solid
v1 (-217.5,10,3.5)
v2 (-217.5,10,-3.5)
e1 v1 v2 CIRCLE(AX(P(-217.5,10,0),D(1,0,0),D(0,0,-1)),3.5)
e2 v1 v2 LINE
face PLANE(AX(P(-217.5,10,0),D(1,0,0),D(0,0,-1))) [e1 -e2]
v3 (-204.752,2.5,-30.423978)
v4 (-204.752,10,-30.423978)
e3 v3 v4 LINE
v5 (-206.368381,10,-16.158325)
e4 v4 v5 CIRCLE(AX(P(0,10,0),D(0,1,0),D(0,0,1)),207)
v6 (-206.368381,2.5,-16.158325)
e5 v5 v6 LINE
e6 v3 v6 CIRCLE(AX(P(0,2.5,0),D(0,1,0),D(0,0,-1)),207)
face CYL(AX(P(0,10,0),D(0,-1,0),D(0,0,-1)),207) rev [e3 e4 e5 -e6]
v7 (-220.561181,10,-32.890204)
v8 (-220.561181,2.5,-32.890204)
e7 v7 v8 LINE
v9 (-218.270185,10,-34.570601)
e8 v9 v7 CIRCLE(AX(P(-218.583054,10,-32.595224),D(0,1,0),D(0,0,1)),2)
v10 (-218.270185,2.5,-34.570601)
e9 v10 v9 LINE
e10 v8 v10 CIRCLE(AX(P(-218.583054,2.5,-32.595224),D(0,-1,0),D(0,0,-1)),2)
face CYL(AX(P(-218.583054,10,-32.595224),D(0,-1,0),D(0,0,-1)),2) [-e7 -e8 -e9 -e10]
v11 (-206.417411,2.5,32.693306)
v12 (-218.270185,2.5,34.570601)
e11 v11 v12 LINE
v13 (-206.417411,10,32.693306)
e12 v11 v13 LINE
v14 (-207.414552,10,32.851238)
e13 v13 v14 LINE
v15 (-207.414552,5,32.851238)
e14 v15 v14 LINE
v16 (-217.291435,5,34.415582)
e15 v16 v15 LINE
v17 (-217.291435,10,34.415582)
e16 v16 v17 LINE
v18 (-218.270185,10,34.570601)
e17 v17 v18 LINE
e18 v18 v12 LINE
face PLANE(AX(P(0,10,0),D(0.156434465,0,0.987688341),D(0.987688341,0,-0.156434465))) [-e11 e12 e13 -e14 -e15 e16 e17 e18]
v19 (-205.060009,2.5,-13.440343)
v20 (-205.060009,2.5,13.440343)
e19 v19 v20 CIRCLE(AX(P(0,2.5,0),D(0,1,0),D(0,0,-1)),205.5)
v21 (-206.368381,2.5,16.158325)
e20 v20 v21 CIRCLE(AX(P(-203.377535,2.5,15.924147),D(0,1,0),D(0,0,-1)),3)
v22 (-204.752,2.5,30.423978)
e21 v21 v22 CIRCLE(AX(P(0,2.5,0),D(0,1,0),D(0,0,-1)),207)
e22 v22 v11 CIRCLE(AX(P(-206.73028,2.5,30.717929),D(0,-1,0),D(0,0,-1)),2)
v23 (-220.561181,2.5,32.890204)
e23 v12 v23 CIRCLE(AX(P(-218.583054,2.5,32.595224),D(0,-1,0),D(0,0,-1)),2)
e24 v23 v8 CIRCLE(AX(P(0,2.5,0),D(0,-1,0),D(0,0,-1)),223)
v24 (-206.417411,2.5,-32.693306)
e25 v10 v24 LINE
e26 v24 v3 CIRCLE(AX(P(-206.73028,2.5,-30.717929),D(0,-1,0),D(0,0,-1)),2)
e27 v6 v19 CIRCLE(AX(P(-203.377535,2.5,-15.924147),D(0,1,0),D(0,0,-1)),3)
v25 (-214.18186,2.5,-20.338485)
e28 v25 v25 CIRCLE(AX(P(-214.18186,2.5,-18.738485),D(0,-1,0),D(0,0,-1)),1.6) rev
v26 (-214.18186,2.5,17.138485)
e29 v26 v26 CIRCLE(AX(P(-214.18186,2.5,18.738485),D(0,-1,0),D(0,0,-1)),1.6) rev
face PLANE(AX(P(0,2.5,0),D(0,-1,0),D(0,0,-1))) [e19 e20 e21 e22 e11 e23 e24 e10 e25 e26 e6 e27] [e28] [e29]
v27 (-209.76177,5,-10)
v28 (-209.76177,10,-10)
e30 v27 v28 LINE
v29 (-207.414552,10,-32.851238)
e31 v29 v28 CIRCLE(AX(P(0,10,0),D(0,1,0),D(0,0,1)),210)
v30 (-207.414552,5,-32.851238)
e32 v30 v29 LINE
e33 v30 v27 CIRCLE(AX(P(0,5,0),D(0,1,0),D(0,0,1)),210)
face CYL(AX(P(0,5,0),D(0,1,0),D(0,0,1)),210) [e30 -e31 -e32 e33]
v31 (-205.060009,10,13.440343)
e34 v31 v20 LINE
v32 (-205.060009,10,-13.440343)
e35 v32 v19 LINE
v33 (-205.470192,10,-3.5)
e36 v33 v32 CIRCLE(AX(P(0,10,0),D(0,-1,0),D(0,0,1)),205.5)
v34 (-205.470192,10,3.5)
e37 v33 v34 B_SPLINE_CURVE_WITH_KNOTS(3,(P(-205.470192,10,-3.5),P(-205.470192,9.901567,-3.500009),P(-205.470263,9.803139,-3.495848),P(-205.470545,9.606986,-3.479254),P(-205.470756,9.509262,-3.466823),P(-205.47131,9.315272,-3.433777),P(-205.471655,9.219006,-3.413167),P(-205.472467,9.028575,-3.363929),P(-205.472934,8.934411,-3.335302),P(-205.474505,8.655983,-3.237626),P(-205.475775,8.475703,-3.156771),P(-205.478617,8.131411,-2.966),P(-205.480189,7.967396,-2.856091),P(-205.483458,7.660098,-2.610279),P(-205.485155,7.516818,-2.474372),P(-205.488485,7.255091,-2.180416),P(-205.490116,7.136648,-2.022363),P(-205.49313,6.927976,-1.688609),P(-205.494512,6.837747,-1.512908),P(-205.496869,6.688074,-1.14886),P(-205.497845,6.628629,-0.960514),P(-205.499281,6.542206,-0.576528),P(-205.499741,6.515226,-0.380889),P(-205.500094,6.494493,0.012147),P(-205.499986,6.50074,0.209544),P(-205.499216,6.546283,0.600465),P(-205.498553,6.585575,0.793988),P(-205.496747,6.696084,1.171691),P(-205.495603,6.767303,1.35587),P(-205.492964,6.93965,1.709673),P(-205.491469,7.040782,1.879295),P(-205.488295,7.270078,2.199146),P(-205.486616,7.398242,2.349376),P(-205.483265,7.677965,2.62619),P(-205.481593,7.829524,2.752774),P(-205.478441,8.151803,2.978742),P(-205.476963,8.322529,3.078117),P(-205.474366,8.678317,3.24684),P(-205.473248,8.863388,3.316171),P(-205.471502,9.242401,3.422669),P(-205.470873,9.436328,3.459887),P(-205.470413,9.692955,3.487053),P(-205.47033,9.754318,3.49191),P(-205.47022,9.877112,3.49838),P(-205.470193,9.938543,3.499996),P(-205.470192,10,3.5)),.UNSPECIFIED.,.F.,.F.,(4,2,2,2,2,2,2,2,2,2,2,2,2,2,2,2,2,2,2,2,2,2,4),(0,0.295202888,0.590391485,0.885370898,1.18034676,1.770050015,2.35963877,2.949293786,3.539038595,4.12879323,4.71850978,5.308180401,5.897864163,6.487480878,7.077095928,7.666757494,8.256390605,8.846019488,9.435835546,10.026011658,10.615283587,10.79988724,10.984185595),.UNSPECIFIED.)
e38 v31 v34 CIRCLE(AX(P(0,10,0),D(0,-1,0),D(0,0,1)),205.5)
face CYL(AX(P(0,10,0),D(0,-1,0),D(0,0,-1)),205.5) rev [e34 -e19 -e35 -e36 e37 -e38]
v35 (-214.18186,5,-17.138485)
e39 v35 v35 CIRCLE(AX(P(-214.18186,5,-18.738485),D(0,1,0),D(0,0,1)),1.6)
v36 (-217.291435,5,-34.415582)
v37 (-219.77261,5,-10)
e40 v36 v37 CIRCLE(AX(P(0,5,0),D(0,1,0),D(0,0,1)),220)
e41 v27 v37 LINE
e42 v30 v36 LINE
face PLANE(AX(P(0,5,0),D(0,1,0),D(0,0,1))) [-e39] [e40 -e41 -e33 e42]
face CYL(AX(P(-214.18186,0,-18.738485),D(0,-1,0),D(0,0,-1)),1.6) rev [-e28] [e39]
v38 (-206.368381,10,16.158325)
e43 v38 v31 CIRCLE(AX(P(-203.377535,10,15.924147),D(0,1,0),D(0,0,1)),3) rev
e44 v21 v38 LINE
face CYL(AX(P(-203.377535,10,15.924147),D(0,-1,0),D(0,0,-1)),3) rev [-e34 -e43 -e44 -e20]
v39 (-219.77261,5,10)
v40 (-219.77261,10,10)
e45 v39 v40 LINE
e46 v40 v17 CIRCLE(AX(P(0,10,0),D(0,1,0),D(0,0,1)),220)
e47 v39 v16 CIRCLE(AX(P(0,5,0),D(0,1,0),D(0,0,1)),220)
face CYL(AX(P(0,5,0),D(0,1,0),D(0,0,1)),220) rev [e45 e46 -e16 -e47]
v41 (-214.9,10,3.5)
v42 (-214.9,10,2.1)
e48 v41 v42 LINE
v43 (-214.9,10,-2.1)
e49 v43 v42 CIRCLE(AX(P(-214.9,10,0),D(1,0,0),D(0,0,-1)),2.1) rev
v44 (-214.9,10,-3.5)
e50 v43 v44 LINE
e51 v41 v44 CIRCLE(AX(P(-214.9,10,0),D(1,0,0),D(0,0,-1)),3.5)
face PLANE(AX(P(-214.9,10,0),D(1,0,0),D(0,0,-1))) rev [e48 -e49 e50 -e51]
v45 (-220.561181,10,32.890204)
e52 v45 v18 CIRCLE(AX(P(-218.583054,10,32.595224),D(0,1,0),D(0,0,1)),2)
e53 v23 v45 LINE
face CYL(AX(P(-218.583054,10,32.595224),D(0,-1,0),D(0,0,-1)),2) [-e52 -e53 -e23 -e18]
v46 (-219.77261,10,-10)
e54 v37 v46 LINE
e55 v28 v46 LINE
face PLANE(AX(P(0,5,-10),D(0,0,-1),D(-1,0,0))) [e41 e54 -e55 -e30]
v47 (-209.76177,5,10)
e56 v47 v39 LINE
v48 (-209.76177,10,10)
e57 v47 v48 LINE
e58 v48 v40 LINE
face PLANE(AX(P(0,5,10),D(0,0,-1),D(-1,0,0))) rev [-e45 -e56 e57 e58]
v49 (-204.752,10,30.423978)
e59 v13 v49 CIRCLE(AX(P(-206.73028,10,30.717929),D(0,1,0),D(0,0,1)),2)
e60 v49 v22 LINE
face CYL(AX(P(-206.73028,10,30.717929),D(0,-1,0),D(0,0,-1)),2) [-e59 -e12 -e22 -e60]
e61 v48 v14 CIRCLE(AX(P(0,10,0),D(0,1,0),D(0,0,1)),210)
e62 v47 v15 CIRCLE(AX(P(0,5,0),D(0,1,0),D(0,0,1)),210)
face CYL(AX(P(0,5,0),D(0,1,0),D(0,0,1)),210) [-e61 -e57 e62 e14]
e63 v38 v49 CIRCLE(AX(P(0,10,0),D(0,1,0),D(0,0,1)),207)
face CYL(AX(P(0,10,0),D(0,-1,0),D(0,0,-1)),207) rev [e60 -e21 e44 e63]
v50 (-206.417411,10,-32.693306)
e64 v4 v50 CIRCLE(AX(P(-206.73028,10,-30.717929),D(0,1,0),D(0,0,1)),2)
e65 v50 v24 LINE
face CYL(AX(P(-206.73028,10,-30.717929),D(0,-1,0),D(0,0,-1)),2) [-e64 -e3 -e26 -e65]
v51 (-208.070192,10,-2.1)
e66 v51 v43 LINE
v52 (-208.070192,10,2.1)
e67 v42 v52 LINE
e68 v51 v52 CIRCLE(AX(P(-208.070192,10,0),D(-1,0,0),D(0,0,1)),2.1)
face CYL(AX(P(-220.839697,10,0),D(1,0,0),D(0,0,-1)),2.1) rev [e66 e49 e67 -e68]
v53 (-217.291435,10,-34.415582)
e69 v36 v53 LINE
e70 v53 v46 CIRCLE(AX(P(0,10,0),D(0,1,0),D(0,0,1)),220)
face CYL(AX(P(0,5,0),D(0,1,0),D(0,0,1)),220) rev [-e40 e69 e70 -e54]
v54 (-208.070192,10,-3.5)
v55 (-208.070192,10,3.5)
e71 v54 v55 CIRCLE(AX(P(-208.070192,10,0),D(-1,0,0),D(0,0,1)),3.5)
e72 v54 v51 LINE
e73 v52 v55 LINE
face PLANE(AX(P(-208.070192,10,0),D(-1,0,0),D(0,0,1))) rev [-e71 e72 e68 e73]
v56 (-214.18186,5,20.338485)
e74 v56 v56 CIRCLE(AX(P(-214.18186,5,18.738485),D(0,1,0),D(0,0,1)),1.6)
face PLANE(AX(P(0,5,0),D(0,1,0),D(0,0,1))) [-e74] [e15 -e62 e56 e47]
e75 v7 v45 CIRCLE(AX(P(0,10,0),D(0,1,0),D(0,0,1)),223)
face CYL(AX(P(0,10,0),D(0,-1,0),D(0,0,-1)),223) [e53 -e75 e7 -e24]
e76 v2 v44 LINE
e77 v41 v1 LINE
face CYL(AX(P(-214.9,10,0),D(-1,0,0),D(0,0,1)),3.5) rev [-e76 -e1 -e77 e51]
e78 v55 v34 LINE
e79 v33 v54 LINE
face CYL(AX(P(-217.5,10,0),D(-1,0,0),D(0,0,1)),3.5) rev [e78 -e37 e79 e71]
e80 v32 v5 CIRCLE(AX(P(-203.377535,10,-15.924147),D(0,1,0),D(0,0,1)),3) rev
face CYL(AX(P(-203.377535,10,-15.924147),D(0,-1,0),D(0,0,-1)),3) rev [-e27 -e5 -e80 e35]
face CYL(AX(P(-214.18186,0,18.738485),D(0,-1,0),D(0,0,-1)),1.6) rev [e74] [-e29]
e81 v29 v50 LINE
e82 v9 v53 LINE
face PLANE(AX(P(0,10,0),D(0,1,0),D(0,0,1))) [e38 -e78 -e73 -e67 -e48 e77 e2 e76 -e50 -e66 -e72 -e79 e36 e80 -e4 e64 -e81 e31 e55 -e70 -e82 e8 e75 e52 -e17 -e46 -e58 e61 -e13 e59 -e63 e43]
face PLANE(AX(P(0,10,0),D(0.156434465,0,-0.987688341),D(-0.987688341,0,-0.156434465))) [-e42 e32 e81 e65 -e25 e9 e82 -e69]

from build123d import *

# Parameters (mm, degrees)
BOSS_EXTRUDE1_DEPTH        = 10
CUT_EXTRUDE1_DEPTH         = 5
F_3_2_3_2_DIAMETER_HOLE1_D = 3.2
BOSS_EXTRUDE2_DEPTH        = 10
FILLET1_R                  = 3
FILLET2_R                  = 2
CUT_EXTRUDE6_DEPTH         = 2.5
SKETCH28_R                 = 3.5
CUT_EXTRUDE7_DEPTH         = 2.6
SKETCH29_W                 = 2.6
SKETCH29_H                 = 3.5
SKETCH30_R                 = 2.1
CUT_EXTRUDE8_DEPTH         = 6.829807515


with BuildPart() as part:
    # Sketch1 → Boss-Extrude1 (new body)
    with BuildSketch(Plane(origin=(0, 0, 0), x_dir=(1, 0, 0), z_dir=(0, 1, 0))):
        with BuildLine():
            ThreePointArc((-207.414551525, 32.851237658), (-210, 0), (-207.414551525, -32.851237658))
            Line((-207.414551525, -32.851237658), (-217.291434931, -34.415582309))
            ThreePointArc((-217.291434931, -34.415582309), (-220, 0), (-217.291434931, 34.415582309))
            Line((-217.291434931, 34.415582309), (-207.414551525, 32.851237658))
        make_face()
        with BuildLine():
            ThreePointArc((-217.291434931, -34.415582309), (-220, 0), (-217.291434931, 34.415582309))
            Line((-217.291434931, 34.415582309), (-220.254499953, 34.884885704))
            ThreePointArc((-220.254499953, 34.884885704), (-223, 0), (-220.254499953, -34.884885704))
            Line((-220.254499953, -34.884885704), (-217.291434931, -34.415582309))
        make_face()
        with BuildLine():
            Line((-204.451486503, 32.381934263), (-207.414551525, 32.851237658))
            ThreePointArc((-207.414551525, 32.851237658), (-210, 0), (-207.414551525, -32.851237658))
            Line((-207.414551525, -32.851237658), (-204.451486503, -32.381934263))
            ThreePointArc((-204.451486503, -32.381934263), (-207, 0), (-204.451486503, 32.381934263))
        make_face()
    extrude(amount=BOSS_EXTRUDE1_DEPTH)

    # Sketch15 → Cut-Extrude1 (cut)
    with BuildSketch(Plane(origin=(0, 10, 0), x_dir=(1, 0, 0), z_dir=(0, 1, 0))):
        with BuildLine():
            Line((-219.772609758, 10), (-209.761769634, 10))
            ThreePointArc((-209.761769634, 10), (-208.900850883, 21.457737542), (-207.414551525, 32.851237658))
            Line((-207.414551525, 32.851237658), (-217.291434931, 34.415582309))
            ThreePointArc((-217.291434931, 34.415582309), (-218.872736893, 22.242415451), (-219.772609758, 10))
        make_face()
        with BuildLine():
            ThreePointArc((-207.414551525, -32.851237658), (-208.900850883, -21.457737542), (-209.761769634, -10))
            Line((-209.761769634, -10), (-219.772609758, -10))
            ThreePointArc((-219.772609758, -10), (-218.872736893, -22.242415451), (-217.291434931, -34.415582309))
            Line((-217.291434931, -34.415582309), (-207.414551525, -32.851237658))
        make_face()
    extrude(amount=-CUT_EXTRUDE1_DEPTH, mode=Mode.SUBTRACT)

    # Ø3.2 (3.2) Diameter Hole1 (through all)
    with Locations(Plane(origin=(0, 0, 0), x_dir=(-1, 0, 0), z_dir=(0, -1, 0))):
        with Locations((214.18186009, -18.738484691), (214.18186009, 18.738484691)):
            Hole(F_3_2_3_2_DIAMETER_HOLE1_D / 2)

    # Sketch19 → Boss-Extrude2 (add)
    with BuildSketch(Plane(origin=(0, 0, 0), x_dir=(1, 0, 0), z_dir=(0, 1, 0))):
        with BuildLine():
            Line((-205.060008726, -13.440343057), (-206.55679711, -13.538447751))
            ThreePointArc((-206.55679711, -13.538447751), (-207, 0), (-206.55679711, 13.538447751))
            Line((-206.55679711, 13.538447751), (-205.060008726, 13.440343057))
            ThreePointArc((-205.060008726, 13.440343057), (-205.5, 0), (-205.060008726, -13.440343057))
        make_face()
    extrude(amount=BOSS_EXTRUDE2_DEPTH)

    # Fillet1
    # the kernel refuses this fillet: 3 mm, written as the material it adds along each edge
    with BuildSketch(Plane(origin=(-206.55679711, 0, -13.538447751), x_dir=(0.071732779716433, 0, -0.9974238859753429), z_dir=(0, 1, 0))) as fillet1_piece_1:
        with BuildLine():
            CenterArc((2.607610468, -2.999939619), FILLET1_R, 89.636481565, 60.364184224)
            Line((0.009516827, -1.49996981), (-0.042445046, -1.469970414))
            ThreePointArc((-0.042445046, -1.469970414), (-0.055240379, -0.750365578), (-0.059998792, -0.000380673))
            Line((-0.059998792, -0.000380673), (-0.000380673, 0.059998792))
            ThreePointArc((-0.000380673, 0.059998792), (1.313322061, 0.064166261), (2.627024794, 0.059998792))
            Line((2.627024794, 0.059998792), (2.626644121, 0))
        make_face()
    extrude(amount=10)
    with BuildSketch(Plane(origin=(-206.55679711, 0, 13.538447751), x_dir=(0.07173277971643319, 0, 0.9974238859753429), z_dir=(0, 1, 0))) as fillet1_piece_2:
        with BuildLine():
            CenterArc((2.607610468, 2.999939619), FILLET1_R, 209.999334211, 60.364184224)
            Line((0.009516827, 1.49996981), (-0.042445046, 1.469970414))
            ThreePointArc((-0.042445046, 1.469970414), (-0.055240379, 0.750365578), (-0.059998792, 0.000380673))
            Line((-0.059998792, 0.000380673), (-0.000380673, -0.059998792))
            ThreePointArc((-0.000380673, -0.059998792), (1.313322061, -0.064166261), (2.627024794, -0.059998792))
            Line((2.627024794, -0.059998792), (2.626644121, 0))
        make_face()
    extrude(amount=10)

    # Fillet2
    fillet2_edges = [part.edges().sort_by_distance(p)[0] for p in [
        (-220.254499953, 5, 34.884885704),
        (-220.254499953, 5, -34.884885704),
        (-204.451486503, 5, -32.381934263),
        (-204.451486503, 5, 32.381934263),
    ]]
    fillet(fillet2_edges, radius=FILLET2_R)

    # Sketch26 → Cut-Extrude6 (cut)
    with BuildSketch(Plane.XZ):
        with BuildLine():
            Line((-218.270184732, -34.570601048), (-206.417411405, -32.693306179))
            ThreePointArc((-206.417411405, -32.693306179), (-205.117889671, -31.901228423), (-204.75200014, -30.423978019))
            ThreePointArc((-204.75200014, -30.423978019), (-205.683905744, -23.30516934), (-206.368380626, -16.158325337))
            ThreePointArc((-206.368380626, -16.158325337), (-206.080650798, -14.622930952), (-205.060008726, -13.440343057))
            ThreePointArc((-205.060008726, -13.440343057), (-205.5, 0), (-205.060008726, 13.440343057))
            ThreePointArc((-205.060008726, 13.440343057), (-206.080650798, 14.622930952), (-206.368380626, 16.158325337))
            ThreePointArc((-206.368380626, 16.158325337), (-205.683905744, 23.30516934), (-204.75200014, 30.423978019))
            ThreePointArc((-204.75200014, 30.423978019), (-205.117889671, 31.901228423), (-206.417411405, 32.693306179))
            Line((-206.417411405, 32.693306179), (-218.270184732, 34.570601048))
            ThreePointArc((-218.270184732, 34.570601048), (-219.765933628, 34.207922413), (-220.561180845, 32.890203773))
            ThreePointArc((-220.561180845, 32.890203773), (-223, 0), (-220.561180845, -32.890203773))
            ThreePointArc((-220.561180845, -32.890203773), (-219.765933628, -34.207922413), (-218.270184732, -34.570601048))
        make_face()
    extrude(amount=-CUT_EXTRUDE6_DEPTH, mode=Mode.SUBTRACT)

    # Sketch28 → Cut-Extrude7 (cut)
    with BuildSketch(Plane(origin=(-217.5, 0, 0), x_dir=(0, 0, -1), z_dir=(1, 0, 0))):
        with Locations((0, 10)):
            Circle(SKETCH28_R)
    extrude(amount=CUT_EXTRUDE7_DEPTH, mode=Mode.SUBTRACT)

    # Sketch29 → Cut-Revolve1 (revolve, cut)
    with BuildSketch(Plane(origin=(0, 10, 0), x_dir=(1, 0, 0), z_dir=(0, 1, 0))):
        with Locations((-206.770192485, -1.75)):
            Rectangle(SKETCH29_W, SKETCH29_H)
    revolve(axis=Axis((-217.5, 10, 0), (1, 0, 0)), mode=Mode.SUBTRACT)

    # Sketch30 → Cut-Extrude8 (cut)
    with BuildSketch(Plane(origin=(-208.070192485, 0, 0), x_dir=(0, 0, -1), z_dir=(1, 0, 0))):
        with Locations((0, 10)):
            Circle(SKETCH30_R)
    extrude(amount=-CUT_EXTRUDE8_DEPTH, mode=Mode.SUBTRACT)


solid = part.part
